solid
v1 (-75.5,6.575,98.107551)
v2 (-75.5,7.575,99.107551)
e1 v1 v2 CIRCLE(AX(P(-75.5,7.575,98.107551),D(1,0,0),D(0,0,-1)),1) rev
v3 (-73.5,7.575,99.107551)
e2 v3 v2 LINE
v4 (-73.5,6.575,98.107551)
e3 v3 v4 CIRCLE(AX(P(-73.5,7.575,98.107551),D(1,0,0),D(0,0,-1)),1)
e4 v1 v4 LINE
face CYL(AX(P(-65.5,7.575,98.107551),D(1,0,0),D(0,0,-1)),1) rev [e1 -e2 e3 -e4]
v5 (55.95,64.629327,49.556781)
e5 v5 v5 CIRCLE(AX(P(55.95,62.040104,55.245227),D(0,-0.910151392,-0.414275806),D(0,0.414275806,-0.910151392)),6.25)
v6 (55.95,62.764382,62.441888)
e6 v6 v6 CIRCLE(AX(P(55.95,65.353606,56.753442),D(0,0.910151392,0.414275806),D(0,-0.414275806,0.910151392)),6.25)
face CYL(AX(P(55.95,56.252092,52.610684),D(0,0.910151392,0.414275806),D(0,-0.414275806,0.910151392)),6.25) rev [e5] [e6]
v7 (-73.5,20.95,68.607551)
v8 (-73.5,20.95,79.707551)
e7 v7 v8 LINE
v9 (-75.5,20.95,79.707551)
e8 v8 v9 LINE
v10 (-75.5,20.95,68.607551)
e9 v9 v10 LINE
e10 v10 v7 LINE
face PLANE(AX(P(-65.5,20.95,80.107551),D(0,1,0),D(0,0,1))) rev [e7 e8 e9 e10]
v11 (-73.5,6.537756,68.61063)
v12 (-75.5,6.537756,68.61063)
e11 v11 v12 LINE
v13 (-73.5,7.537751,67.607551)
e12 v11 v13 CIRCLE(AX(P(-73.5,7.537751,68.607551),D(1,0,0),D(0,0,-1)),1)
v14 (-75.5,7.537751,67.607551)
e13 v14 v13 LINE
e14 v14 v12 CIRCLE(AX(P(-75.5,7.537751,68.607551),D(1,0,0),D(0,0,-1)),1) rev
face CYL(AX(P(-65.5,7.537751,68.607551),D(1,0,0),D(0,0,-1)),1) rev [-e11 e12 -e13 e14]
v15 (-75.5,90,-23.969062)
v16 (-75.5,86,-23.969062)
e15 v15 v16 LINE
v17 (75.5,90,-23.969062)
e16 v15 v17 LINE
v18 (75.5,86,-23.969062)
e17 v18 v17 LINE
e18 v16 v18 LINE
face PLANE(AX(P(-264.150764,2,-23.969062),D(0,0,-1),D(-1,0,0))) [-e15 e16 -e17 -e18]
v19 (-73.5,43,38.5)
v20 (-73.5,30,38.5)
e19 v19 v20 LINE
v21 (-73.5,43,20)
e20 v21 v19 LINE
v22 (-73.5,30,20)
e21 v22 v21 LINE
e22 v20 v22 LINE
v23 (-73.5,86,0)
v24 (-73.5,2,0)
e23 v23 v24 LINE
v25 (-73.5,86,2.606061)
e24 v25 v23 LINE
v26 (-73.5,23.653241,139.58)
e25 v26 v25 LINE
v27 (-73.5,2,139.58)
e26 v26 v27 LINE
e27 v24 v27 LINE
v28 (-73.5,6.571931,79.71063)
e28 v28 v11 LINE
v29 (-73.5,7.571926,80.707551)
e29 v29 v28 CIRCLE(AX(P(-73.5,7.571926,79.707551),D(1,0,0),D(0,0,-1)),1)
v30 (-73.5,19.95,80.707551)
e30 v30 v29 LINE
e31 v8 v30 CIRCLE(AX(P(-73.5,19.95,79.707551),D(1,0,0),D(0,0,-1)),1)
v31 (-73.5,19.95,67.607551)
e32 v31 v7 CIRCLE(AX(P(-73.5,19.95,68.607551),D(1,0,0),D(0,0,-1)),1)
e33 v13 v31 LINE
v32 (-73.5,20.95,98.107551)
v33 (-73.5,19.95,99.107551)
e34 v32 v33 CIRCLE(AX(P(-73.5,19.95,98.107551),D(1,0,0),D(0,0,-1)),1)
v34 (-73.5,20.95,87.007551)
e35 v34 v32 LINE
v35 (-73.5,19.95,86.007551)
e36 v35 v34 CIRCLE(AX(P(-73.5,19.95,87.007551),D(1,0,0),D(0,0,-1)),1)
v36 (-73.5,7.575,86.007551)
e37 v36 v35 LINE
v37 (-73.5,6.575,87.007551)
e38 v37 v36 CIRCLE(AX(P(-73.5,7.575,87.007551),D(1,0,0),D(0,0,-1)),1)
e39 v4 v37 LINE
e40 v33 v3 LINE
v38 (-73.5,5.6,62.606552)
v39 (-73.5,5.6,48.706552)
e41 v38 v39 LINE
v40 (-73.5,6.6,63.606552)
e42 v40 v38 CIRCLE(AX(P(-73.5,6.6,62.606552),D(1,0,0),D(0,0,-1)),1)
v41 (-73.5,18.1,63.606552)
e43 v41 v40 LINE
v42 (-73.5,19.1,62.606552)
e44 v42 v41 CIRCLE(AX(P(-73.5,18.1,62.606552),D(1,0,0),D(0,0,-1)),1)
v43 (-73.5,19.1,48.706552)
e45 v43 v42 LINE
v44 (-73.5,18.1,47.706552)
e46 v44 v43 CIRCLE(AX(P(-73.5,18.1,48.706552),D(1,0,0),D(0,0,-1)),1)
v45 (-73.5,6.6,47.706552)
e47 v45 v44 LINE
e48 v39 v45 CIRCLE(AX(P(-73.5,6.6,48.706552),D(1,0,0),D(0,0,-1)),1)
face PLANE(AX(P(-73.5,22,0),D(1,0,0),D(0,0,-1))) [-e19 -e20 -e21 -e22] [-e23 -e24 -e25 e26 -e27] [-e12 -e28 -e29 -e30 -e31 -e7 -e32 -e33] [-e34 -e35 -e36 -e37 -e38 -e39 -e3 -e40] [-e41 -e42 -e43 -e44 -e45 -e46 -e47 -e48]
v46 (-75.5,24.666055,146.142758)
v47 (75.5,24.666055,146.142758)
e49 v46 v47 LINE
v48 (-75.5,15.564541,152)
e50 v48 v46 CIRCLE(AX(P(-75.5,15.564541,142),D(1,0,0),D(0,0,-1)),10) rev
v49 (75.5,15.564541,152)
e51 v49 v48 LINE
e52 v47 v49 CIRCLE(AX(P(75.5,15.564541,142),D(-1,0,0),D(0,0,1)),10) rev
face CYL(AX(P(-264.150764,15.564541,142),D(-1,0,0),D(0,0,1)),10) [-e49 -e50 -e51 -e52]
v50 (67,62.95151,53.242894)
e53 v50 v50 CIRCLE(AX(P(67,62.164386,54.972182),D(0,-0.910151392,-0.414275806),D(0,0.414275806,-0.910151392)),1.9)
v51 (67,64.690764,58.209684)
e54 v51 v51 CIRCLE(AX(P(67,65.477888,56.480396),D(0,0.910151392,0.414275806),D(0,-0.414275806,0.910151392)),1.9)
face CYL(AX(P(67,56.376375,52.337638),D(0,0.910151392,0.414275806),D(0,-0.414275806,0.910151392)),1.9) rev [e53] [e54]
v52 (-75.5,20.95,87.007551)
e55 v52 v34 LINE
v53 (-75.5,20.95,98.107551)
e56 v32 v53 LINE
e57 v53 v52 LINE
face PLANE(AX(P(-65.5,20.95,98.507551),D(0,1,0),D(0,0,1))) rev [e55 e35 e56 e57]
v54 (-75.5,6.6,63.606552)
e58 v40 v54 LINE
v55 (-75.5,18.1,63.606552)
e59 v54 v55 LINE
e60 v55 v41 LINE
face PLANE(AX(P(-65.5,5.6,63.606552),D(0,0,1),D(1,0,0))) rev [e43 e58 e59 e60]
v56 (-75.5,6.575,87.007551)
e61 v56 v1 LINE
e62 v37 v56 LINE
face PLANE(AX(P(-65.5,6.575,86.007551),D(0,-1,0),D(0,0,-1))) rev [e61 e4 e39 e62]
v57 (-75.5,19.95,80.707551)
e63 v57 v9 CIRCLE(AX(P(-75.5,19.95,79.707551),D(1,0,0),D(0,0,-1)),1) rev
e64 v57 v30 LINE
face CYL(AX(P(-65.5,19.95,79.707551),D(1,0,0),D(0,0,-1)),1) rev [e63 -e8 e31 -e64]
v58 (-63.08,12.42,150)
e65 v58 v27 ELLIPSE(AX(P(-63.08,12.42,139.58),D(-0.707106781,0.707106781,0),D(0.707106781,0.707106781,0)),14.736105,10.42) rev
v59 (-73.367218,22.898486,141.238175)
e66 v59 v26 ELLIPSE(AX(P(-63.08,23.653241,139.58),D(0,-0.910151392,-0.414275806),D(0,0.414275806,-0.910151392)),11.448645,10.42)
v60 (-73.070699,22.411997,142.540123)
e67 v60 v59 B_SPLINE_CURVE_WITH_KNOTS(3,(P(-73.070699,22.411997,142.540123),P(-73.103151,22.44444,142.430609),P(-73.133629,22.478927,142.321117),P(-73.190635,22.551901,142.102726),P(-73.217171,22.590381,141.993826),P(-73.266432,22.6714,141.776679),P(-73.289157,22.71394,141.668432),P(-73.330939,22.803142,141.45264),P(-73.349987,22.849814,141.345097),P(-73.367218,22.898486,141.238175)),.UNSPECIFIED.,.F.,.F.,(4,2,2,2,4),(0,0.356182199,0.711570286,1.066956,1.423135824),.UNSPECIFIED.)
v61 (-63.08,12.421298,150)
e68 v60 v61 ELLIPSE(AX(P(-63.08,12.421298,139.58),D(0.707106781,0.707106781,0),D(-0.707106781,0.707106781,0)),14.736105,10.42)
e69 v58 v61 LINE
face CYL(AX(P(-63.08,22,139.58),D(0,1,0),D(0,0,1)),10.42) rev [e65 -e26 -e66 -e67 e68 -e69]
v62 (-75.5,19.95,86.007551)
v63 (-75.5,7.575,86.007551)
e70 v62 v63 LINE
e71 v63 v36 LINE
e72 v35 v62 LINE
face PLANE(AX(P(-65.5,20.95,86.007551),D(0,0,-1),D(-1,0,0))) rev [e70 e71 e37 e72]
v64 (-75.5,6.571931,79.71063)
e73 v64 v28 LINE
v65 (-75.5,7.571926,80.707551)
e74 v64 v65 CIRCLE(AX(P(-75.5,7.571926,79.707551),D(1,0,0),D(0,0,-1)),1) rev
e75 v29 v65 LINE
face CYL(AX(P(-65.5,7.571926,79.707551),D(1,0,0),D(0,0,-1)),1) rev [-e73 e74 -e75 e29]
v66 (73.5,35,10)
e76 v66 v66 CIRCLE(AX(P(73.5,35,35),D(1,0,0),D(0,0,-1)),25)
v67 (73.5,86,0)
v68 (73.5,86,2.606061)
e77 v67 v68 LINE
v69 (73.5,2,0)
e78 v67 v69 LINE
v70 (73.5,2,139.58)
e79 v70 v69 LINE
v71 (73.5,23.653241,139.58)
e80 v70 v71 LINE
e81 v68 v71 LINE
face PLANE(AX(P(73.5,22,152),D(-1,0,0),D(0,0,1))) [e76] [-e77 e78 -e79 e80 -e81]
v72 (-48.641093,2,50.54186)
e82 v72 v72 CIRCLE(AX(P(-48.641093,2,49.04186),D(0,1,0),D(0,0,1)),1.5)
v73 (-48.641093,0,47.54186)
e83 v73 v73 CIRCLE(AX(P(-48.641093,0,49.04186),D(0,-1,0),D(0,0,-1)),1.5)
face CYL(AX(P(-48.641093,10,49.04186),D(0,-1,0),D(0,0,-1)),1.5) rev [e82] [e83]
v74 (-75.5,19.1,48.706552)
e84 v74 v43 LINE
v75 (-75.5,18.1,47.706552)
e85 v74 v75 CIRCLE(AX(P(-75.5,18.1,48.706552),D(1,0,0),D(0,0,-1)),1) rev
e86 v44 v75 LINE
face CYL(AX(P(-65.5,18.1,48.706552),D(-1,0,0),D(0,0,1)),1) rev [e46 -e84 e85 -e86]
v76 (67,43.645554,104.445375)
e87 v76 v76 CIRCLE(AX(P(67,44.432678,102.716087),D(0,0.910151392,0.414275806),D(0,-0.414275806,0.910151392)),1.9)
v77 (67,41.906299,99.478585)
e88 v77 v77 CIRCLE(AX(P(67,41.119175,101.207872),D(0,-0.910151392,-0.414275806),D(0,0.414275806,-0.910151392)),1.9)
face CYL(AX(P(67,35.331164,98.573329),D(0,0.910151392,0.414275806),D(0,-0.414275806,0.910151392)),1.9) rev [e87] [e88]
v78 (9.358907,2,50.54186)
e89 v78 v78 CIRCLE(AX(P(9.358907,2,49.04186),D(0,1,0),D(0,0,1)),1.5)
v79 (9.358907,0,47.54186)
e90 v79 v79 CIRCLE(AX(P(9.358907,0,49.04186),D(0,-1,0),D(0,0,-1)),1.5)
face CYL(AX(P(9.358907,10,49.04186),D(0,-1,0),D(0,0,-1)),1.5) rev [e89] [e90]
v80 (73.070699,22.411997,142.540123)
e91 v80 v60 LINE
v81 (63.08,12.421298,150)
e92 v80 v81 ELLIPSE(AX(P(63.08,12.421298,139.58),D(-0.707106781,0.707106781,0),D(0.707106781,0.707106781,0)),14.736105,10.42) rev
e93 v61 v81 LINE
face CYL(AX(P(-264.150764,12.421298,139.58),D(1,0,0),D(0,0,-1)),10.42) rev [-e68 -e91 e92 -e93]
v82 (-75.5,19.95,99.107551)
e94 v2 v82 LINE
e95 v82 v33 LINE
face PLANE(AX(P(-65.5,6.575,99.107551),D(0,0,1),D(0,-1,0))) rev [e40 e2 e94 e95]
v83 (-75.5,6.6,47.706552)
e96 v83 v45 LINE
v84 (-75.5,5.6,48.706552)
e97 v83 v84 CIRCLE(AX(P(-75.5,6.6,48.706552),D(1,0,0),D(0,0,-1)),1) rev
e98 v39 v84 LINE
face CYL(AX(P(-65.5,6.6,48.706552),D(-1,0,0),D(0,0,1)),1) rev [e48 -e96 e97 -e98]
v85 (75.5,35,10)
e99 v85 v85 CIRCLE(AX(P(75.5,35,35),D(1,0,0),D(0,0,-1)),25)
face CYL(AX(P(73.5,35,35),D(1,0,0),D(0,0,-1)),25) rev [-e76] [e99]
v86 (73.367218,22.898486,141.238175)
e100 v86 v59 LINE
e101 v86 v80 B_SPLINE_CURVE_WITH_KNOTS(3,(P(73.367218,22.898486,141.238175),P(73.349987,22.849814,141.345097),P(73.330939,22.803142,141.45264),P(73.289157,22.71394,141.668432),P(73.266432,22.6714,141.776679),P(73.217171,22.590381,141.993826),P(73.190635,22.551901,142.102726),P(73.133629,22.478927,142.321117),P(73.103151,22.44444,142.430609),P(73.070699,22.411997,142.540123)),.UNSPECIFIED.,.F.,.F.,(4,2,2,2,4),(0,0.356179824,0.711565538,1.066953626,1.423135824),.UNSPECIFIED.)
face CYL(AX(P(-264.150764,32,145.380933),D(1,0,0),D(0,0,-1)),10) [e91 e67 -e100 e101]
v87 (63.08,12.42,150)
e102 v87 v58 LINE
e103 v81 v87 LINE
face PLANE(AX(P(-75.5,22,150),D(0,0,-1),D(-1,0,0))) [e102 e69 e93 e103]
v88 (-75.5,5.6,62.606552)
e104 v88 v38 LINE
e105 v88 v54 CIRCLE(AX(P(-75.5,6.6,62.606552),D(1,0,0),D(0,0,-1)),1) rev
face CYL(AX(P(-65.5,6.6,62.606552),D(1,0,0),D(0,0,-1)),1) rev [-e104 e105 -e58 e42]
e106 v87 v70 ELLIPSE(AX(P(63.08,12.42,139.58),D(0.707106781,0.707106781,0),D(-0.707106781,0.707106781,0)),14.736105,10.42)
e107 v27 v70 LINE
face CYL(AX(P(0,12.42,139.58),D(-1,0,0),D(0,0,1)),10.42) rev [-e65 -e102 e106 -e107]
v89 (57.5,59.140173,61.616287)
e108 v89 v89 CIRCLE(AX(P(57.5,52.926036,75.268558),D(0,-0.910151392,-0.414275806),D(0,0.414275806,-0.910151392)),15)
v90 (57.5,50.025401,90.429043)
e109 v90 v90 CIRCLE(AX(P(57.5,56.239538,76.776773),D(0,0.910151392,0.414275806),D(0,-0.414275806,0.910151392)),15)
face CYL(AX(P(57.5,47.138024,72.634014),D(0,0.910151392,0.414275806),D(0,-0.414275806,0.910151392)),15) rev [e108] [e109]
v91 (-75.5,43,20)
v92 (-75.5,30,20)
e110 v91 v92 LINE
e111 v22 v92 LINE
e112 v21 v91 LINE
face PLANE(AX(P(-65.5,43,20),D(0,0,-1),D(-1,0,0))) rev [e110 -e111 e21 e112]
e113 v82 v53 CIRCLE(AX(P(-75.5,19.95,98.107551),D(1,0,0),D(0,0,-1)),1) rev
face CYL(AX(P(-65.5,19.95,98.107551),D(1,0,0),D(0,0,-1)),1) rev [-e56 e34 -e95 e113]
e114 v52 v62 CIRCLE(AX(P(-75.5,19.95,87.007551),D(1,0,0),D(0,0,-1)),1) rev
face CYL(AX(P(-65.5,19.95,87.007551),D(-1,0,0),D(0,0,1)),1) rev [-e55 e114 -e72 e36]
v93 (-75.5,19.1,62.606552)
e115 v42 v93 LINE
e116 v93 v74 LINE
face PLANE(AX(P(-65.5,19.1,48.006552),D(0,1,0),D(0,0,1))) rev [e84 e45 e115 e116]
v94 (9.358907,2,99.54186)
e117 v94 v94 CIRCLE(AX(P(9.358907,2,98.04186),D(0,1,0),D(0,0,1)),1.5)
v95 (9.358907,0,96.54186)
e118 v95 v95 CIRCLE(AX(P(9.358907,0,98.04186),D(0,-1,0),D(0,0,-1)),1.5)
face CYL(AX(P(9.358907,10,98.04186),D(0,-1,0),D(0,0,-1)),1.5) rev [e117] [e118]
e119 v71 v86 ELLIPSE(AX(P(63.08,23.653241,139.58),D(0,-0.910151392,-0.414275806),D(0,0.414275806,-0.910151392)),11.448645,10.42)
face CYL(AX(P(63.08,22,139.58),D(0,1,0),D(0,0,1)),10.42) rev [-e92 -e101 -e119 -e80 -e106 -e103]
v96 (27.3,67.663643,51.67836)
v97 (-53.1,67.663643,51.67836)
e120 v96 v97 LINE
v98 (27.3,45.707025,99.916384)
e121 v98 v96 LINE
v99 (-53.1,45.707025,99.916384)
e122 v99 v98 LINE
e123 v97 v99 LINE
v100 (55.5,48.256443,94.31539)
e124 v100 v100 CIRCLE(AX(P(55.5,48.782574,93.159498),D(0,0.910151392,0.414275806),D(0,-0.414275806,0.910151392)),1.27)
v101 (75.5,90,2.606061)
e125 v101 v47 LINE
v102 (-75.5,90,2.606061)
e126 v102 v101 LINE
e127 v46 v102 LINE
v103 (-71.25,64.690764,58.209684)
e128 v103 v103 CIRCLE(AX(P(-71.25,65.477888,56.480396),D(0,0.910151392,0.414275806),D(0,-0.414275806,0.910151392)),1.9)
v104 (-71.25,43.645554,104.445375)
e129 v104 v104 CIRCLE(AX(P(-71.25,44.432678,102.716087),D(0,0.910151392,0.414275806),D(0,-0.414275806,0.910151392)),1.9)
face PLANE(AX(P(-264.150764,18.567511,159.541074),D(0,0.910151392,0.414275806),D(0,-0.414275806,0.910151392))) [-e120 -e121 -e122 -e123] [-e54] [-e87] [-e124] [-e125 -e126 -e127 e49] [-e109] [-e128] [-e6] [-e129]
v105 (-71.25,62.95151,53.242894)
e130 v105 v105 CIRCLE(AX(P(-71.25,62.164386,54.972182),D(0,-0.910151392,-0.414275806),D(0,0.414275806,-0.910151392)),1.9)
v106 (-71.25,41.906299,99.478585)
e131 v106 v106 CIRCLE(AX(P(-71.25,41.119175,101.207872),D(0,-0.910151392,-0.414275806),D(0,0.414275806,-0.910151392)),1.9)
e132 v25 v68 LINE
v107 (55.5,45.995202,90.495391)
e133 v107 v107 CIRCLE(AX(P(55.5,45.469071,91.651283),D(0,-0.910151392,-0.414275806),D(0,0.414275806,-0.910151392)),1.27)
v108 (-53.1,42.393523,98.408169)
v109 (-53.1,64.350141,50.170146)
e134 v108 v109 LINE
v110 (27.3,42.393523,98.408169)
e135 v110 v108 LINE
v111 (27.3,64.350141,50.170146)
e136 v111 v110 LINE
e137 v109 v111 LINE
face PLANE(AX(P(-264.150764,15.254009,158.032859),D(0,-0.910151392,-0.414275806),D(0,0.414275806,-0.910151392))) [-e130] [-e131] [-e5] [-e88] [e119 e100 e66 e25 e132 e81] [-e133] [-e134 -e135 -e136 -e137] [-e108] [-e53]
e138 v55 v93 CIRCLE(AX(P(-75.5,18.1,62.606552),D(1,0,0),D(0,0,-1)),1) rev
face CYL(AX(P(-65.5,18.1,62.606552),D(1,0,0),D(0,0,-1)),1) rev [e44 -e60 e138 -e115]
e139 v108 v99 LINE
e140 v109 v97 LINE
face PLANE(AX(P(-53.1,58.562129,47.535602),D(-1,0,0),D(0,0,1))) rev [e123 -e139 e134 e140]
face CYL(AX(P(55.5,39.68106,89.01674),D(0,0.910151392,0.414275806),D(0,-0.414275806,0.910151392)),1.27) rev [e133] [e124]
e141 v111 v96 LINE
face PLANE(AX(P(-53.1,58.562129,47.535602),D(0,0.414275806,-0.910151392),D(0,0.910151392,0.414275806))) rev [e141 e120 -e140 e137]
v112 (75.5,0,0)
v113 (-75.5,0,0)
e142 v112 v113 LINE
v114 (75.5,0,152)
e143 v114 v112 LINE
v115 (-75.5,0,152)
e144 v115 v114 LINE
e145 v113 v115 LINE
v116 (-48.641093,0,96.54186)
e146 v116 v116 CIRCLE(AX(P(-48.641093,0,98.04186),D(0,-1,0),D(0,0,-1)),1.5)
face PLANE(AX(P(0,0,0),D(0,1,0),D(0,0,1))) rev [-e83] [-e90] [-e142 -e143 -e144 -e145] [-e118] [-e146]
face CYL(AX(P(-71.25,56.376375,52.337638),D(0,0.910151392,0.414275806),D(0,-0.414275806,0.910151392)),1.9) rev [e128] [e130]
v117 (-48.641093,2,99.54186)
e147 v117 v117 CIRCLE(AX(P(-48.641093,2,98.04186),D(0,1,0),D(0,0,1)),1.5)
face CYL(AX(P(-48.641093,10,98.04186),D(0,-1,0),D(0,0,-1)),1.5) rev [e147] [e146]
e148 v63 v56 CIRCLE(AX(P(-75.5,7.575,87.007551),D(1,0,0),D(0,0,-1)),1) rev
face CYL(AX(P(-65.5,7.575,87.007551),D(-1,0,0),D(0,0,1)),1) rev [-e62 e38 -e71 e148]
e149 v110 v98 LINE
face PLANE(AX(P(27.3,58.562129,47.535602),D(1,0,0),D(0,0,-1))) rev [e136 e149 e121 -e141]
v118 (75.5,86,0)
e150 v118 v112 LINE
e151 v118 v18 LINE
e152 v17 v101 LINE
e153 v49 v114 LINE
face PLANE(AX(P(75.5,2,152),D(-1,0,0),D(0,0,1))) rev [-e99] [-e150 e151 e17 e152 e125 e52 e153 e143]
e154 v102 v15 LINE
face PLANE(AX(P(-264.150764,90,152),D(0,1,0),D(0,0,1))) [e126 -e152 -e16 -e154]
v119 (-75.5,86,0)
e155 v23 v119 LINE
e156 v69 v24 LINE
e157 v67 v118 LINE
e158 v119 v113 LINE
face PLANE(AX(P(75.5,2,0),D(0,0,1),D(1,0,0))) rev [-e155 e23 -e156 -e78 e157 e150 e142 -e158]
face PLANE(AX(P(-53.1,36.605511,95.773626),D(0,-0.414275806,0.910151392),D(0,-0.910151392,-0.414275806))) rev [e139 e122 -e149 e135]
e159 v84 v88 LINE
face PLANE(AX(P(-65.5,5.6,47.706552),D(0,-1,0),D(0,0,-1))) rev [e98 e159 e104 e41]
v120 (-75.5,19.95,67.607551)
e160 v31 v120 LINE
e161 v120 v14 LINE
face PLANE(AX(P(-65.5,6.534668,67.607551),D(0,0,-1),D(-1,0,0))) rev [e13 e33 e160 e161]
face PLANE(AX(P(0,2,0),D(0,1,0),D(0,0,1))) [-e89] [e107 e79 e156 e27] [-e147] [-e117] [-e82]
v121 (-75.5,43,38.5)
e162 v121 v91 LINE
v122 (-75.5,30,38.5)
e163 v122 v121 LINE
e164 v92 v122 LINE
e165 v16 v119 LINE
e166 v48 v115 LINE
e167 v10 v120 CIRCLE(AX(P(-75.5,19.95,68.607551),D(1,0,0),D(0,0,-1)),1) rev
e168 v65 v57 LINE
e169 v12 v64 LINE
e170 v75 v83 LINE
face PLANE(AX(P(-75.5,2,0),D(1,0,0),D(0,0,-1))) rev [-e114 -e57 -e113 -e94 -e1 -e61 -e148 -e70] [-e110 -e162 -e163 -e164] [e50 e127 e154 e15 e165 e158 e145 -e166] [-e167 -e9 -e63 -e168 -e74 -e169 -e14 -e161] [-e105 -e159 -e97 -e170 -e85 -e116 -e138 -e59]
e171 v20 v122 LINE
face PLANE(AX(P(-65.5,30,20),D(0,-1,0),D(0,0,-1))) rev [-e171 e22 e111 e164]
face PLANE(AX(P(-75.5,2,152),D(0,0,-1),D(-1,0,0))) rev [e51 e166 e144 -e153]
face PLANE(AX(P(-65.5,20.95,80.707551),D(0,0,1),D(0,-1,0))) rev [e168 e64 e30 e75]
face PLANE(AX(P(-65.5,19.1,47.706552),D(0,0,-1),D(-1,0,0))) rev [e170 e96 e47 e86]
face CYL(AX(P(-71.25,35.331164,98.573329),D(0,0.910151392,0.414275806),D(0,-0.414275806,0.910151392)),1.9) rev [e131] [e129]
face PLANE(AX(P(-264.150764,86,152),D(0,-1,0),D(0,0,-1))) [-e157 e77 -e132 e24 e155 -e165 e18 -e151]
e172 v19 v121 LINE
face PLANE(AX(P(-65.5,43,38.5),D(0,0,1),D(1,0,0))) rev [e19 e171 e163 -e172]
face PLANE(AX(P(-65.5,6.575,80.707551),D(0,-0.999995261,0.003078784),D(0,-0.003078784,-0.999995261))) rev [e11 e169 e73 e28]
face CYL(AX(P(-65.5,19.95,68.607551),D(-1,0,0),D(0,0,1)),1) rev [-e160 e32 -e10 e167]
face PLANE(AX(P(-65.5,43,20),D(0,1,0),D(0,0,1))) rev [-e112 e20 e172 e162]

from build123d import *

# Parameters (mm, degrees)
SKETCH2_W           = 151
SKETCH2_H           = 152
BOSS_EXTRUDE1_DEPTH = 2
EXTRUDE_THIN1_DEPTH = 20
BOSS_EXTRUDE3_START = 75.5
BOSS_EXTRUDE3_DEPTH = 151
BOSS_EXTRUDE4_DEPTH = 2
BOSS_EXTRUDE5_DEPTH = 2
SKETCH8_R           = 25
CUT_EXTRUDE1_DEPTH  = 2
SKETCH9_W           = 80.4
SKETCH9_H           = 53
CUT_EXTRUDE6_DEPTH  = 10
SKETCH10_R          = 6.25
CUT_EXTRUDE7_DEPTH  = 10
SKETCH11_R          = 15
CUT_EXTRUDE8_DEPTH  = 10
SKETCH12_R          = 1.9
SKETCH12_R_2        = 1.27
CUT_EXTRUDE9_DEPTH  = 10
FILLET2_R           = 10
SKETCH15_W          = 18.5
SKETCH15_H          = 13
CUT_EXTRUDE12_DEPTH = 10
CUT_EXTRUDE13_DEPTH = 10
FILLET5_R           = 1
FILLET6_R           = 1
FILLET7_R           = 1
FILLET8_R           = 1
FILLET9_R           = 1
FILLET10_R          = 1
FILLET11_R          = 1
FILLET12_R          = 1
FILLET13_R          = 1
FILLET14_R          = 1
FILLET15_R          = 1
FILLET16_R          = 1
SKETCH19_R          = 1.5
CUT_EXTRUDE14_DEPTH = 10
FILLET17_R          = 10
FILLET19_R          = 10.42


with BuildPart() as part:
    # Sketch2 → Boss-Extrude1 (new body)
    with BuildSketch(Plane(origin=(0, 0, 0), x_dir=(1, 0, 0), z_dir=(0, 1, 0))):
        with Locations((0, -76)):
            Rectangle(SKETCH2_W, SKETCH2_H)
    extrude(amount=BOSS_EXTRUDE1_DEPTH)

    # Sketch3 → Extrude-Thin1 (add)
    with BuildSketch(Plane(origin=(0, 2, 0), x_dir=(1, 0, 0), z_dir=(0, 1, 0))):
        Polygon((-75.5, 0), (-75.5, -152), (75.5, -152), (75.5, 0), (73.5, 0), (73.5, -150), (-73.5, -150), (-73.5, 0), align=None)
    extrude(amount=EXTRUDE_THIN1_DEPTH)

    # Sketch4 → Boss-Extrude3 (add)
    with BuildSketch(Plane(origin=(0, 0, 0), x_dir=(0, 0, -1), z_dir=(1, 0, 0)).offset(BOSS_EXTRUDE3_START)):
        Polygon((0, 86), (23.969061552, 86), (23.969061552, 90), (0, 90), (-2.606060606, 90), (-152, 22), (-143.212121212, 22), (-2.606060606, 86), align=None)
    extrude(amount=-BOSS_EXTRUDE3_DEPTH)

    # Sketch6 → Boss-Extrude4 (add)
    with BuildSketch(Plane(origin=(75.5, 0, 0), x_dir=(0, 0, -1), z_dir=(1, 0, 0))):
        Polygon((0, 22), (-143.212121212, 22), (-2.606060606, 86), (0, 86), align=None)
    extrude(amount=-BOSS_EXTRUDE4_DEPTH)

    # Sketch7 → Boss-Extrude5 (add)
    with BuildSketch(Plane.ZY.offset(75.5)):
        Polygon((0, 86), (0, 22), (143.212121212, 22), (2.606060606, 86), align=None)
    extrude(amount=-BOSS_EXTRUDE5_DEPTH)

    # Sketch8 → Cut-Extrude1 (cut)
    with BuildSketch(Plane(origin=(75.5, 0, 0), x_dir=(0, 0, -1), z_dir=(1, 0, 0))):
        with Locations((-35, 35)):
            Circle(SKETCH8_R)
    extrude(amount=-CUT_EXTRUDE1_DEPTH, mode=Mode.SUBTRACT)

    # Sketch9 → Cut-Extrude6 (cut)
    with BuildSketch(Plane(origin=(0, 75.536424885, 34.382096844), x_dir=(1, 0, 0), z_dir=(0, 0.9101513920874156, 0.41427580605357506))):
        with Locations((-12.9, -45.503721555)):
            Rectangle(SKETCH9_W, SKETCH9_H)
    extrude(amount=-CUT_EXTRUDE6_DEPTH, mode=Mode.SUBTRACT)

    # Sketch10 → Cut-Extrude7 (cut)
    with BuildSketch(Plane(origin=(0, 75.536424885, 34.382096844), x_dir=(1, 0, 0), z_dir=(0, 0.9101513920874156, 0.41427580605357506))):
        with Locations(Location((55.95, -24.579806444, 0), (0, 0, 270))):
            Circle(SKETCH10_R)
    extrude(amount=-CUT_EXTRUDE7_DEPTH, mode=Mode.SUBTRACT)

    # Sketch11 → Cut-Extrude8 (cut)
    with BuildSketch(Plane(origin=(0, 75.536424885, 34.382096844), x_dir=(1, 0, 0), z_dir=(0, 0.9101513920874156, 0.41427580605357506))):
        with Locations(Location((57.5, -46.579806444, 0), (0, 0, 270))):
            Circle(SKETCH11_R)
    extrude(amount=-CUT_EXTRUDE8_DEPTH, mode=Mode.SUBTRACT)

    # Sketch12 → Cut-Extrude9 (cut)
    with BuildSketch(Plane(origin=(0, 75.536424885, 34.382096844), x_dir=(1, 0, 0), z_dir=(0, 0.9101513920874156, 0.41427580605357506))):
        with Locations(Location((67, -24.279806444, 0), (0, 0, 270))):
            Circle(SKETCH12_R)
        with Locations(Location((67, -75.079806444, 0), (0, 0, 270))):
            Circle(SKETCH12_R)
        with Locations(Location((-71.25, -24.279806444, 0), (0, 0, 270))):
            Circle(SKETCH12_R)
        with Locations(Location((-71.25, -75.079806444, 0), (0, 0, 270))):
            Circle(SKETCH12_R)
        with Locations(Location((55.5, -64.579806444, 0), (0, 0, 270))):
            Circle(SKETCH12_R_2)
    extrude(amount=-CUT_EXTRUDE9_DEPTH, mode=Mode.SUBTRACT)

    # Fillet2
    fillet2_edges = [part.edges().sort_by_distance(p)[0] for p in [
        (0, 22, 152),
    ]]
    fillet(fillet2_edges, radius=FILLET2_R)

    # Sketch15 → Cut-Extrude12 (cut)
    with BuildSketch(Plane.ZY.offset(75.5)):
        with Locations((29.25, 36.5)):
            Rectangle(SKETCH15_W, SKETCH15_H)
    extrude(amount=-CUT_EXTRUDE12_DEPTH, mode=Mode.SUBTRACT)

    # Sketch18 → Cut-Extrude13 (cut)
    with BuildSketch(Plane.ZY.offset(75.5)):
        Polygon((48.006551759, 19.1), (47.706551759, 19.1), (47.706551759, 5.6), (63.606551759, 5.6), (63.606551759, 19.1), align=None)
        Polygon((80.107551094, 20.95), (80.707551094, 20.95), (80.707551094, 6.575), (67.607551094, 6.534667741), (67.607551094, 20.95), align=None)
        Polygon((98.507551094, 20.95), (99.107551094, 20.95), (99.107551094, 6.575), (86.007551094, 6.575), (86.007551094, 20.95), align=None)
    extrude(amount=-CUT_EXTRUDE13_DEPTH, mode=Mode.SUBTRACT)

    # Fillet5
    fillet5_edges = [part.edges().sort_by_distance(p)[0] for p in [
        (-74.5, 20.95, 99.107551094),
    ]]
    fillet(fillet5_edges, radius=FILLET5_R)

    # Fillet6
    fillet6_edges = [part.edges().sort_by_distance(p)[0] for p in [
        (-74.5, 20.95, 86.007551094),
    ]]
    fillet(fillet6_edges, radius=FILLET6_R)

    # Fillet7
    fillet7_edges = [part.edges().sort_by_distance(p)[0] for p in [
        (-74.5, 6.575, 86.007551094),
    ]]
    fillet(fillet7_edges, radius=FILLET7_R)

    # Fillet8
    fillet8_edges = [part.edges().sort_by_distance(p)[0] for p in [
        (-74.5, 6.575, 99.107551094),
    ]]
    fillet(fillet8_edges, radius=FILLET8_R)

    # Fillet9
    fillet9_edges = [part.edges().sort_by_distance(p)[0] for p in [
        (-74.5, 20.95, 80.707551094),
    ]]
    fillet(fillet9_edges, radius=FILLET9_R)

    # Fillet10
    fillet10_edges = [part.edges().sort_by_distance(p)[0] for p in [
        (-74.5, 6.534667741, 67.607551094),
    ]]
    fillet(fillet10_edges, radius=FILLET10_R)

    # Fillet11
    fillet11_edges = [part.edges().sort_by_distance(p)[0] for p in [
        (-74.5, 20.95, 67.607551094),
    ]]
    fillet(fillet11_edges, radius=FILLET11_R)

    # Fillet12
    fillet12_edges = [part.edges().sort_by_distance(p)[0] for p in [
        (-74.5, 6.575, 80.707551094),
    ]]
    fillet(fillet12_edges, radius=FILLET12_R)

    # Fillet13
    fillet13_edges = [part.edges().sort_by_distance(p)[0] for p in [
        (-74.5, 19.1, 63.606551759),
    ]]
    fillet(fillet13_edges, radius=FILLET13_R)

    # Fillet14
    fillet14_edges = [part.edges().sort_by_distance(p)[0] for p in [
        (-74.5, 19.1, 47.706551759),
    ]]
    fillet(fillet14_edges, radius=FILLET14_R)

    # Fillet15
    fillet15_edges = [part.edges().sort_by_distance(p)[0] for p in [
        (-74.5, 5.6, 47.706551759),
    ]]
    fillet(fillet15_edges, radius=FILLET15_R)

    # Fillet16
    fillet16_edges = [part.edges().sort_by_distance(p)[0] for p in [
        (-74.5, 5.6, 63.606551759),
    ]]
    fillet(fillet16_edges, radius=FILLET16_R)

    # Sketch19 → Cut-Extrude14 (cut)
    with BuildSketch(Plane.XZ):
        with Locations(Location((9.358907141, 98.041860309, 0), (0, 0, 270))):
            Circle(SKETCH19_R)
        with Locations(Location((-48.641092859, 98.041860309, 0), (0, 0, 270))):
            Circle(SKETCH19_R)
        with Locations(Location((-48.641092859, 49.041860309, 0), (0, 0, 270))):
            Circle(SKETCH19_R)
        with Locations(Location((9.358907141, 49.041860309, 0), (0, 0, 270))):
            Circle(SKETCH19_R)
    extrude(amount=-CUT_EXTRUDE14_DEPTH, mode=Mode.SUBTRACT)

    # Fillet17
    fillet17_edges = [part.edges().sort_by_distance(p)[0] for p in [
        (0, 22, 143.212121212),
    ]]
    fillet(fillet17_edges, radius=FILLET17_R)

    # Fillet19
    # the kernel refuses this fillet: 10.42 mm, written as the material it adds along each edge
    with BuildSketch(Plane(origin=(-73.5, -24.05, 150), x_dir=(0, 0, -1), z_dir=(0, 1, 0))) as fillet19_piece_1_section:
        with BuildLine():
            CenterArc((FILLET19_R, -FILLET19_R), FILLET19_R, 90, 90)
            Line((0, -FILLET19_R), (0, 0))
            Line((0, 0), (FILLET19_R, 0))
        make_face()
    fillet19_piece_1 = extrude(amount=72.1, mode=Mode.PRIVATE)
    fillet19_piece_1 = split(fillet19_piece_1, bisect_by=Plane(origin=(-73.5, 11.537299555, 166.198357039), z_dir=(0, -0.9101513920874158, -0.41427580605357495)), keep=Keep.TOP, mode=Mode.PRIVATE)
    fillet19_piece_1 = split(fillet19_piece_1, bisect_by=Plane(origin=(-73.5, 0, 150), z_dir=(0, 1, 0)), keep=Keep.TOP, mode=Mode.PRIVATE)
    with BuildSketch(Plane(origin=(-73.5, -24.05, 150), x_dir=(0, 0, -1), z_dir=(0, 1, 0))) as fillet19_piece_2_section:
        with BuildLine():
            CenterArc((FILLET19_R, -FILLET19_R), FILLET19_R, 90, 90)
            Line((0, -FILLET19_R), (0, 0))
            Line((0, 0), (FILLET19_R, 0))
        make_face()
    fillet19_piece_2 = extrude(amount=72.1, mode=Mode.PRIVATE)
    fillet19_piece_2 = fillet19_piece_2 & Plane(origin=(-73.5, 15.564541031, 142), x_dir=(0, 0, 1), z_dir=(1, 0, 0)) * Cylinder(10, 186, mode=Mode.PRIVATE)
    with BuildSketch(Plane(origin=(73.5, -24.05, 150), x_dir=(-1, 0, 0), z_dir=(0, 1, 0))) as fillet19_piece_3_section:
        with BuildLine():
            CenterArc((FILLET19_R, -FILLET19_R), FILLET19_R, 90, 90)
            Line((0, -FILLET19_R), (0, 0))
            Line((0, 0), (FILLET19_R, 0))
        make_face()
    fillet19_piece_3 = extrude(amount=72.1, mode=Mode.PRIVATE)
    fillet19_piece_3 = split(fillet19_piece_3, bisect_by=Plane(origin=(73.5, 11.537299555, 166.198357039), z_dir=(0, -0.9101513920874158, -0.41427580605357495)), keep=Keep.TOP, mode=Mode.PRIVATE)
    fillet19_piece_3 = split(fillet19_piece_3, bisect_by=Plane(origin=(73.5, 0, 150), z_dir=(0, 1, 0)), keep=Keep.TOP, mode=Mode.PRIVATE)
    with BuildSketch(Plane(origin=(73.5, -24.05, 150), x_dir=(-1, 0, 0), z_dir=(0, 1, 0))) as fillet19_piece_4_section:
        with BuildLine():
            CenterArc((FILLET19_R, -FILLET19_R), FILLET19_R, 90, 90)
            Line((0, -FILLET19_R), (0, 0))
            Line((0, 0), (FILLET19_R, 0))
        make_face()
    fillet19_piece_4 = extrude(amount=72.1, mode=Mode.PRIVATE)
    fillet19_piece_4 = fillet19_piece_4 & Plane(origin=(73.5, 15.564541031, 142), x_dir=(0, 0, 1), z_dir=(1, 0, 0)) * Cylinder(10, 186, mode=Mode.PRIVATE)
    with BuildSketch(Plane(origin=(99.55, 2, 150), x_dir=(0, 1, 0), z_dir=(-1, 0, 0))) as fillet19_piece_5_section:
        with BuildLine():
            CenterArc((FILLET19_R, FILLET19_R), FILLET19_R, 180, 90)
            Line((0, FILLET19_R), (0, 0))
            Line((0, 0), (FILLET19_R, 0))
        make_face()
    fillet19_piece_5 = extrude(amount=199.1, mode=Mode.PRIVATE)
    fillet19_piece_5 = split(fillet19_piece_5, bisect_by=Plane(origin=(-75.5, 2, 150), z_dir=(1, 0, 0)), keep=Keep.TOP, mode=Mode.PRIVATE)
    fillet19_piece_5 = split(fillet19_piece_5, bisect_by=Plane(origin=(75.5, 2, 150), z_dir=(-1, 0, 0)), keep=Keep.TOP, mode=Mode.PRIVATE)
    with BuildSketch(Plane(origin=(97.446755584, 22, 150), x_dir=(0, 0.055144349629415036, -0.9984783927075983), z_dir=(-1, 0, 0))) as fillet19_piece_6_section:
        with BuildLine():
            CenterArc((9.875933547, 10.138731334), FILLET19_R, 183.161141999, 73.496080828)
            Line((-0.528211305, 9.564127211), (-1.56862579, 9.506666798))
            Line((-1.56862579, 9.506666798), (-1.040414485, -0.057460412))
            Line((-1.040414485, -0.057460412), (0.057460412, -1.040414485))
            ThreePointArc((0.057460412, -1.040414485), (4.669499422, -0.785699017), (7.230776161, -1.013873133))
            Line((7.230776161, -1.013873133), (7.471245014, 0))
        make_face()
    fillet19_piece_6 = extrude(amount=194.893511169, mode=Mode.PRIVATE)
    fillet19_piece_6 = split(fillet19_piece_6, bisect_by=Plane(origin=(-75.5, 22, 150), z_dir=(1, 0, 0)), keep=Keep.TOP, mode=Mode.PRIVATE)
    fillet19_piece_6 = split(fillet19_piece_6, bisect_by=Plane(origin=(75.5, 22, 150), z_dir=(-1, 0, 0)), keep=Keep.TOP, mode=Mode.PRIVATE)
    fillet19_piece_6 = fillet19_piece_6 & Plane(origin=(97.446755584, 15.564541031, 142), x_dir=(0, 0, 1), z_dir=(1, 0, 0)) * Cylinder(10, 429, mode=Mode.PRIVATE)
    add([fillet19_piece_1, fillet19_piece_2, fillet19_piece_3, fillet19_piece_4, fillet19_piece_5, fillet19_piece_6])


solid = part.part
